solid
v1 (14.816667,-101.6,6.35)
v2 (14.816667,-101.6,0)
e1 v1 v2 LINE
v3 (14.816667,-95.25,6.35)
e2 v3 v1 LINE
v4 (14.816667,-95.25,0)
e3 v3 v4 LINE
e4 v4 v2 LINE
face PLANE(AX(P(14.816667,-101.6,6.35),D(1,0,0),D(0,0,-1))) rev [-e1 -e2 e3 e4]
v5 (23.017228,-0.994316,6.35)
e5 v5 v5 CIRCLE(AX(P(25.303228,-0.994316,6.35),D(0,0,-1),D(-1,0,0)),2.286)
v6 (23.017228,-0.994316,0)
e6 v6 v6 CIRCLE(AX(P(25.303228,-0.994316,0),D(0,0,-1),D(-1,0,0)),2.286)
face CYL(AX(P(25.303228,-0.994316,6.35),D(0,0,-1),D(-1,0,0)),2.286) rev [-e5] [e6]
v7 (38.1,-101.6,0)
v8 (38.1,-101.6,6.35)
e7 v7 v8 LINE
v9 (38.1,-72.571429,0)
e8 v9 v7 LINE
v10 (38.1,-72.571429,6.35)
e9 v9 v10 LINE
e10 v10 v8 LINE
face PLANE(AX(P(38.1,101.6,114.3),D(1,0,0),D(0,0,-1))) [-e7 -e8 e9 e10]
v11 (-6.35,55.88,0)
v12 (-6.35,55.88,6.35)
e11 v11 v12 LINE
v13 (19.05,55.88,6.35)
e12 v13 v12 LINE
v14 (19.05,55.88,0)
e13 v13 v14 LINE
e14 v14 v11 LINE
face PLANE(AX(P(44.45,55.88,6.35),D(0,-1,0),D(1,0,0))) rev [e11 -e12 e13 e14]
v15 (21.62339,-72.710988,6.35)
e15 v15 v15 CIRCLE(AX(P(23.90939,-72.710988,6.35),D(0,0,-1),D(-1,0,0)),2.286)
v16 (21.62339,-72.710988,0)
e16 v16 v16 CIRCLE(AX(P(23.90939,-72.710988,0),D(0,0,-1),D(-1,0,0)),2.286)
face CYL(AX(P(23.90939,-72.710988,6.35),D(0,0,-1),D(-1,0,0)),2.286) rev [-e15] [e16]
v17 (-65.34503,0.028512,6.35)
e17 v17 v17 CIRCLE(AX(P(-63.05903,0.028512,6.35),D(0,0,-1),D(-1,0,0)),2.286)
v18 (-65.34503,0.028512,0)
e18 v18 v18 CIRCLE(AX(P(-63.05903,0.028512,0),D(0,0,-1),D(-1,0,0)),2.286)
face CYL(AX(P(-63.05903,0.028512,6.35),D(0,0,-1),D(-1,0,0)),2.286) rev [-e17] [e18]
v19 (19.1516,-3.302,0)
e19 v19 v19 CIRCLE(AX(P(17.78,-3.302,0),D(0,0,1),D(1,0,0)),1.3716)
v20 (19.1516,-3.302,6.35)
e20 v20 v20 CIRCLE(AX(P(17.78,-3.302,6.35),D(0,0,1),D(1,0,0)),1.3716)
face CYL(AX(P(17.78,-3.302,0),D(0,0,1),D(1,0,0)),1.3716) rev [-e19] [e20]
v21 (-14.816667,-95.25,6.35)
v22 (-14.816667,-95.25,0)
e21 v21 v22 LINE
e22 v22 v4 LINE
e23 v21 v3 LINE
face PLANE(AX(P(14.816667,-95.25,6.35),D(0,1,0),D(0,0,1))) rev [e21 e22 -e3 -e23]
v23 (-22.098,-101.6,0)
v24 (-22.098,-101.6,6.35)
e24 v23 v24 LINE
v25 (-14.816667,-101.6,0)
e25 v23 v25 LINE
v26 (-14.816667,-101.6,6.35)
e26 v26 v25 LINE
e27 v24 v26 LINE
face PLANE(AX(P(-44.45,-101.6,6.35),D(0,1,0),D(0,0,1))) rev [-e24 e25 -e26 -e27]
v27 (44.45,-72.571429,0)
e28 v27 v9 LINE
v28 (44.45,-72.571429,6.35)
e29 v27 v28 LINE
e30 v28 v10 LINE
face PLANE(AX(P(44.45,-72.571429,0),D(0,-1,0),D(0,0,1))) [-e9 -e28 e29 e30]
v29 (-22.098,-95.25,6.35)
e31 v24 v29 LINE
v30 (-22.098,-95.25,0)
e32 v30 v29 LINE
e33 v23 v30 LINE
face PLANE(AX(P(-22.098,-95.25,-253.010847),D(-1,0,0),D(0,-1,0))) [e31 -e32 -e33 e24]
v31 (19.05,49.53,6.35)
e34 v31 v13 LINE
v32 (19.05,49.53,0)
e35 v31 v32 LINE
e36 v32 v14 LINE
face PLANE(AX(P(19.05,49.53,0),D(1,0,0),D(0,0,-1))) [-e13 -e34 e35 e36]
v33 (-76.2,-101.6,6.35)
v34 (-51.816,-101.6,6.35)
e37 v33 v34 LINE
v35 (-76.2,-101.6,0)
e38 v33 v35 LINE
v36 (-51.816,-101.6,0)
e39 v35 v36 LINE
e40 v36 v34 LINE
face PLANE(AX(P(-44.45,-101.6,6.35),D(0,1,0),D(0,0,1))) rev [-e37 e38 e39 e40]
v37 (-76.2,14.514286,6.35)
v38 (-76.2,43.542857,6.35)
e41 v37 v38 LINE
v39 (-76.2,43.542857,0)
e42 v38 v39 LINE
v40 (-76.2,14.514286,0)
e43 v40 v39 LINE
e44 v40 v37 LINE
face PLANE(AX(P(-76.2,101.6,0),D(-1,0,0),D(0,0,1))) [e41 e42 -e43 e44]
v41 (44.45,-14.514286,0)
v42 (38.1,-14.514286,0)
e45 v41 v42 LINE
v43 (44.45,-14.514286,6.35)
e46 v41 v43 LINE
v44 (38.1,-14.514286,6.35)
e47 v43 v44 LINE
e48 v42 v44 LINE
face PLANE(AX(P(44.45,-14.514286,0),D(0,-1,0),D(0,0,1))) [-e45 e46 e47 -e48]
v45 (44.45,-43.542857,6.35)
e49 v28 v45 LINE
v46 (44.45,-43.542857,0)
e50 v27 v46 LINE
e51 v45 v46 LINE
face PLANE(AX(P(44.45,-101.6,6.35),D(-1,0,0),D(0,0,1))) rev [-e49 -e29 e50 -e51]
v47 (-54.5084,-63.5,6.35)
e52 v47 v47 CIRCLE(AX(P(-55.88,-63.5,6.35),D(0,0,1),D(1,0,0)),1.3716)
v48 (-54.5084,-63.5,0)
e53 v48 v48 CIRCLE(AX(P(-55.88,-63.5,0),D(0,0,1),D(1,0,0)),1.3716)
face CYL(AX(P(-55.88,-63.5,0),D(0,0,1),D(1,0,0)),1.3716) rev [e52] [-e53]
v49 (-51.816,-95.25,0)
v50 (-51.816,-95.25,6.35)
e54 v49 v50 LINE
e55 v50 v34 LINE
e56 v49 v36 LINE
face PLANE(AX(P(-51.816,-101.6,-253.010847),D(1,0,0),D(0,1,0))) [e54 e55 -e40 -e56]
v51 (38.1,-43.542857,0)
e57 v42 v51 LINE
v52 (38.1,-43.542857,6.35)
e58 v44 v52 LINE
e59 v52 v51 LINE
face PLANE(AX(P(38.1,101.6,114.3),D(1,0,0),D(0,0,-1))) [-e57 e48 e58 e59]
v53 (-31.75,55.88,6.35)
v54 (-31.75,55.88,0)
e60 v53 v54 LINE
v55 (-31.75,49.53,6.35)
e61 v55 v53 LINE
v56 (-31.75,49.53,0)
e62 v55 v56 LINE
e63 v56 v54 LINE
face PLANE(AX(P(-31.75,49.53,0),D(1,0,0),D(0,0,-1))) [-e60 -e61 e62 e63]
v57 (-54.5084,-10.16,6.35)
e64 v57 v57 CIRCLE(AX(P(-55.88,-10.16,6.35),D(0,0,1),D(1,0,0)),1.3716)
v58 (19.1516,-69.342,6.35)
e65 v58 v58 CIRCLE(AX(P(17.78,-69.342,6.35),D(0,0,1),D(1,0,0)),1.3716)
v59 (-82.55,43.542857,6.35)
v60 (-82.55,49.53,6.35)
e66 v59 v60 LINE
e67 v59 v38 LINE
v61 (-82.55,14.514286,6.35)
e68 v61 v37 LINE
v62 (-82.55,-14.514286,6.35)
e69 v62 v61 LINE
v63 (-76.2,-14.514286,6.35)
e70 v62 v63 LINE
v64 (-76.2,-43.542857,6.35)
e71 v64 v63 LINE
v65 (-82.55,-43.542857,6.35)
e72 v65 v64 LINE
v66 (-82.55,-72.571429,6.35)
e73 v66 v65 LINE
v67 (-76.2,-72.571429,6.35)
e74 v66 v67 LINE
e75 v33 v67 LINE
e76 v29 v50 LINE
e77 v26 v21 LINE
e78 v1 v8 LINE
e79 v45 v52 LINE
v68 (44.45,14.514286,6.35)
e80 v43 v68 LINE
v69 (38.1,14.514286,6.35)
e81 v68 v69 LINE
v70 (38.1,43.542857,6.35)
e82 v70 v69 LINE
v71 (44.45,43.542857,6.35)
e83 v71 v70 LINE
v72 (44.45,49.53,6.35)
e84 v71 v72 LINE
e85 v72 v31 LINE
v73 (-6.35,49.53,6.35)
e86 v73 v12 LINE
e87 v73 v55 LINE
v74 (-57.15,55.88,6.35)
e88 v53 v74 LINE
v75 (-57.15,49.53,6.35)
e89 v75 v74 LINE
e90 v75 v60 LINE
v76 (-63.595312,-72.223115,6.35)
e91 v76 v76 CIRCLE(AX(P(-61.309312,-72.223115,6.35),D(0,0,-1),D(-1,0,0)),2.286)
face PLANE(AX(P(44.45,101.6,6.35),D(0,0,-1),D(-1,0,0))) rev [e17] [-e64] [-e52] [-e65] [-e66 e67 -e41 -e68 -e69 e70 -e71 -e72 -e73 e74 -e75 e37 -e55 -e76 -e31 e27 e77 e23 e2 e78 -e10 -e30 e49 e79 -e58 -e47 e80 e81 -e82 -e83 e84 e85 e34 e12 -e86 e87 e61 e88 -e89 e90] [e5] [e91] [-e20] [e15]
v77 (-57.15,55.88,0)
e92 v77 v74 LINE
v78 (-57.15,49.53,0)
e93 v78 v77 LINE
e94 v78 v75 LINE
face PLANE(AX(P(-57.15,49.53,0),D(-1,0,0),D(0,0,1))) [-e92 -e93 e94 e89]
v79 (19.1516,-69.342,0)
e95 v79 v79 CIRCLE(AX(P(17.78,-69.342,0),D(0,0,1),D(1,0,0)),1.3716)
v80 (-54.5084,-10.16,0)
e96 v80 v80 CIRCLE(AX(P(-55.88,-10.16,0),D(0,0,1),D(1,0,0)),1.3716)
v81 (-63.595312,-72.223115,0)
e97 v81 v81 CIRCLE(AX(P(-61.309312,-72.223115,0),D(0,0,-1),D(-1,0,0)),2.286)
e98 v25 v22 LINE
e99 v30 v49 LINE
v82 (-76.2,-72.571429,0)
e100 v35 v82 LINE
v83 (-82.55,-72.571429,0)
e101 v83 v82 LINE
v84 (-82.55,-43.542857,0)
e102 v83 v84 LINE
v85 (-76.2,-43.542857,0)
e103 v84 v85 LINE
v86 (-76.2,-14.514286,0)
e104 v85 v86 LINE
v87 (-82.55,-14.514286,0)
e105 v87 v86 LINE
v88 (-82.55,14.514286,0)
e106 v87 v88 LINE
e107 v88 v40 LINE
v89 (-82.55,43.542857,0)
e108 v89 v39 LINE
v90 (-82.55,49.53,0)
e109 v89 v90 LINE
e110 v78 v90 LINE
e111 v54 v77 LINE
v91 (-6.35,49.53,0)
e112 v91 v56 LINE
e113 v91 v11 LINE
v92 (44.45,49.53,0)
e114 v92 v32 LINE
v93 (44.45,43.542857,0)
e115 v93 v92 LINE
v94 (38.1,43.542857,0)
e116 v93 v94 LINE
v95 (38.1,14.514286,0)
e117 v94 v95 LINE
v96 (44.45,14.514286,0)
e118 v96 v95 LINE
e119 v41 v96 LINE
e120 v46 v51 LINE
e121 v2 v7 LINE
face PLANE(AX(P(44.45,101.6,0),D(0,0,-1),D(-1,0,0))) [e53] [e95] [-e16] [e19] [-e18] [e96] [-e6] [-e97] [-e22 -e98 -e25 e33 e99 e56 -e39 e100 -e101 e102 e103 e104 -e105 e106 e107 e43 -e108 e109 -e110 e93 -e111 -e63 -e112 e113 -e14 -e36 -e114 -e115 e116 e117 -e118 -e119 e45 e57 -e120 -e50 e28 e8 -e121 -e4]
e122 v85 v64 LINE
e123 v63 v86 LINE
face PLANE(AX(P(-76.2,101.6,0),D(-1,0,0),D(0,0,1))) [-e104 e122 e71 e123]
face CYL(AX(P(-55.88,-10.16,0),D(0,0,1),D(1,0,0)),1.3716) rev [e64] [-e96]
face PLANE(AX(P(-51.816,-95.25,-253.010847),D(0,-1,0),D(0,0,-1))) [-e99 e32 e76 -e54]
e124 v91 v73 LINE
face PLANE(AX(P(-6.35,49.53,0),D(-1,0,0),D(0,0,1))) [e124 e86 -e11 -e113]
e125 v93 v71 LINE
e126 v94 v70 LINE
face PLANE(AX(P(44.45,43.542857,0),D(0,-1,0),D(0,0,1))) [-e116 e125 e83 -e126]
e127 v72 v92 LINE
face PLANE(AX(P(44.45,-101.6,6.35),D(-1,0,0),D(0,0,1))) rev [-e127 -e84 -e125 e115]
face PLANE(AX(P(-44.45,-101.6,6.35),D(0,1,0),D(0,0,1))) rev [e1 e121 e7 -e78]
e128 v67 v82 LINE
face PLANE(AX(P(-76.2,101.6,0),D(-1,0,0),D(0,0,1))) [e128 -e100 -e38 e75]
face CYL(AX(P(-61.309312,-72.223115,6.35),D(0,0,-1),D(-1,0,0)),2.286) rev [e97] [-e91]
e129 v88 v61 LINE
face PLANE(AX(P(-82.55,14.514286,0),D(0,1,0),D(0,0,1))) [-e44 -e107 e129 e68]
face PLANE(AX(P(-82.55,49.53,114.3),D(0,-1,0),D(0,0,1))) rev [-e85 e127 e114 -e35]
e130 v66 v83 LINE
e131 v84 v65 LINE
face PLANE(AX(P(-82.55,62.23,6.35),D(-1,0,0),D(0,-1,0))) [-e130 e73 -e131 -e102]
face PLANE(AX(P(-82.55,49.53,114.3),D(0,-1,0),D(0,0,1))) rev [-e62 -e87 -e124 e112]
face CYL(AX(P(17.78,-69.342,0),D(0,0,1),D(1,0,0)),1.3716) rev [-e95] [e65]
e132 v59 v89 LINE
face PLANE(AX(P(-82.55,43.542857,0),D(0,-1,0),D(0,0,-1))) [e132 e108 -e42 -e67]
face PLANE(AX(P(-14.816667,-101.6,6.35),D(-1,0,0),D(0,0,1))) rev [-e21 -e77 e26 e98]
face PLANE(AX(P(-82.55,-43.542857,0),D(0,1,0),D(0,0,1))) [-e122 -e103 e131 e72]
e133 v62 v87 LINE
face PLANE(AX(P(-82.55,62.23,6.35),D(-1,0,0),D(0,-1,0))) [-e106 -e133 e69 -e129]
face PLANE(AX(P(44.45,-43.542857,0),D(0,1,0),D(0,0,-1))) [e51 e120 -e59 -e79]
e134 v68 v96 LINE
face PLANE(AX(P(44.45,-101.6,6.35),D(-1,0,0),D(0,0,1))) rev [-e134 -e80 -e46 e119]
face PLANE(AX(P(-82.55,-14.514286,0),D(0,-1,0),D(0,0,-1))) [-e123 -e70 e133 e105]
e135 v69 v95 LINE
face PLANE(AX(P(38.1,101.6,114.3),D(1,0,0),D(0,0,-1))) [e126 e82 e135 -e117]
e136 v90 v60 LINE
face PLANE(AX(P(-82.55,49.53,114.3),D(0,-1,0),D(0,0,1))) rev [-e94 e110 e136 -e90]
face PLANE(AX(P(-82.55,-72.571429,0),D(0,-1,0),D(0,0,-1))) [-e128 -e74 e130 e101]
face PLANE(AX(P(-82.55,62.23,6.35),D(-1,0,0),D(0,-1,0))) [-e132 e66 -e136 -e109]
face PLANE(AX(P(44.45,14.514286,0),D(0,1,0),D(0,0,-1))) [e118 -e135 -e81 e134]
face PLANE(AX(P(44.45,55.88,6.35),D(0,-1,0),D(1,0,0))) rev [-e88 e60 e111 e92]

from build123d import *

# Parameters (mm, degrees)
SKETCH1_W               = 88.9
SKETCH1_H               = 203.2
BOSS_EXTRUDE1_DEPTH     = 6.35
SKETCH3_W               = 29.633333334
SKETCH3_H               = 6.35
CUT_EXTRUDE2_DEPTH      = 112.079633597
CAVITY2_START           = -101.6
CAVITY2_OUTLINE_W       = 6.35
CAVITY2_OUTLINE_H       = 6.35
CAVITY2_DEPTH           = 29.028571429
CAVITY2_START_2         = -43.542857143
CAVITY2_2_OUTLINE_W     = 6.35
CAVITY2_2_OUTLINE_H     = 6.35
CAVITY2_2_DEPTH         = 29.028571429
CAVITY2_START_3         = 14.514285714
CAVITY2_3_OUTLINE_W     = 6.35
CAVITY2_3_OUTLINE_H     = 6.35
CAVITY2_3_DEPTH         = 29.028571429
CUT_EXTRUDE3_DEPTH      = 112.079633597
SKETCH5_W               = 38.1
SKETCH5_H               = 163.83
BOSS_EXTRUDE2_DEPTH     = 6.35
CAVITY3_START           = 49.53
CAVITY3_OUTLINE_W       = 25.4
CAVITY3_OUTLINE_H       = 6.35
CAVITY3_DEPTH           = 6.35
CAVITY3_START_2         = -101.6
CAVITY3_2_OUTLINE_W     = 6.35
CAVITY3_2_OUTLINE_H     = 6.35
CAVITY3_2_DEPTH         = 29.028571429
CAVITY3_START_3         = -43.542857143
CAVITY3_3_OUTLINE_W     = 6.35
CAVITY3_3_OUTLINE_H     = 6.35
CAVITY3_3_DEPTH         = 29.028571429
CAVITY3_START_4         = 14.514285714
CAVITY3_4_OUTLINE_W     = 6.35
CAVITY3_4_OUTLINE_H     = 6.35
CAVITY3_4_DEPTH         = 29.028571429
SKETCH7_W               = 127
SKETCH7_H               = 6.35
CUT_EXTRUDE4_DEPTH      = 132.062523247
CUT_EXTRUDE5_DEPTH      = 132.062523247
CUT_EXTRUDE5_DEPTH_BACK = 132.062523247
SKETCH9_R               = 1.3716
CUT_EXTRUDE6_DEPTH      = 132.062523247
SKETCH10_R              = 2.286
CUT_EXTRUDE8_DEPTH      = 132.062523247


# Read off the part's stored shape, not the designer's step: Cavity2, Cavity3
with BuildPart() as part:
    # Sketch1 → Boss-Extrude1 (new body)
    with BuildSketch(Plane.XY):
        Rectangle(SKETCH1_W, SKETCH1_H)
    extrude(amount=BOSS_EXTRUDE1_DEPTH)

    # Sketch3 → Cut-Extrude2 (cut, through all)
    with BuildSketch(Plane(origin=(0, 0, 0), x_dir=(-1, 0, 0), z_dir=(0, 0, -1))):
        with Locations((0, -98.425)):
            Rectangle(SKETCH3_W, SKETCH3_H)
    extrude(amount=-CUT_EXTRUDE2_DEPTH, mode=Mode.SUBTRACT)

    # Cavity2 outline → Cavity2 (cut)
    with BuildSketch(Plane(origin=(0, 0, 0), x_dir=(1, 0, 0), z_dir=(0, 1, 0)).offset(CAVITY2_START)):
        with Locations((41.275, -3.175)):
            Rectangle(CAVITY2_OUTLINE_W, CAVITY2_OUTLINE_H)
    extrude(amount=CAVITY2_DEPTH, mode=Mode.SUBTRACT)

    # Cavity2 2 outline → Cavity2 2 (cut)
    with BuildSketch(Plane(origin=(0, 0, 0), x_dir=(1, 0, 0), z_dir=(0, 1, 0)).offset(CAVITY2_START_2)):
        with Locations((41.275, -3.175)):
            Rectangle(CAVITY2_2_OUTLINE_W, CAVITY2_2_OUTLINE_H)
    extrude(amount=CAVITY2_2_DEPTH, mode=Mode.SUBTRACT)

    # Cavity2 3 outline → Cavity2 3 (cut)
    with BuildSketch(Plane(origin=(0, 0, 0), x_dir=(1, 0, 0), z_dir=(0, 1, 0)).offset(CAVITY2_START_3)):
        with Locations((41.275, -3.175)):
            Rectangle(CAVITY2_3_OUTLINE_W, CAVITY2_3_OUTLINE_H)
    extrude(amount=CAVITY2_3_DEPTH, mode=Mode.SUBTRACT)

    # Sketch4 → Cut-Extrude3 (cut, through all)
    with BuildSketch(Plane(origin=(0, 0, 0), x_dir=(-1, 0, 0), z_dir=(0, 0, -1))):
        Polygon((0, 62.23), (44.45, 62.23), (44.45, 101.6), (-44.45, 101.6), (-44.45, 62.23), align=None)
    extrude(amount=-CUT_EXTRUDE3_DEPTH, mode=Mode.SUBTRACT)

    # Sketch5 → Boss-Extrude2 (add, through all)
    with BuildSketch(Plane(origin=(0, 0, 0), x_dir=(-1, 0, 0), z_dir=(0, 0, -1))):
        with Locations((63.5, -19.685)):
            Rectangle(SKETCH5_W, SKETCH5_H)
    extrude(amount=-BOSS_EXTRUDE2_DEPTH)

    # Cavity3 outline → Cavity3 (cut)
    with BuildSketch(Plane(origin=(0, 0, 0), x_dir=(1, 0, 0), z_dir=(0, 1, 0)).offset(CAVITY3_START)):
        with Locations((-69.85, -3.175)):
            Rectangle(CAVITY3_OUTLINE_W, CAVITY3_OUTLINE_H)
        with Locations((-19.05, -3.175)):
            Rectangle(CAVITY3_OUTLINE_W, CAVITY3_OUTLINE_H)
        with Locations((31.75, -3.175)):
            Rectangle(CAVITY3_OUTLINE_W, CAVITY3_OUTLINE_H)
    extrude(amount=CAVITY3_DEPTH, mode=Mode.SUBTRACT)

    # Cavity3 2 outline → Cavity3 2 (cut)
    with BuildSketch(Plane(origin=(0, 0, 0), x_dir=(1, 0, 0), z_dir=(0, 1, 0)).offset(CAVITY3_START_2)):
        with Locations((-79.375, -3.175)):
            Rectangle(CAVITY3_2_OUTLINE_W, CAVITY3_2_OUTLINE_H)
    extrude(amount=CAVITY3_2_DEPTH, mode=Mode.SUBTRACT)

    # Cavity3 3 outline → Cavity3 3 (cut)
    with BuildSketch(Plane(origin=(0, 0, 0), x_dir=(1, 0, 0), z_dir=(0, 1, 0)).offset(CAVITY3_START_3)):
        with Locations((-79.375, -3.175)):
            Rectangle(CAVITY3_3_OUTLINE_W, CAVITY3_3_OUTLINE_H)
    extrude(amount=CAVITY3_3_DEPTH, mode=Mode.SUBTRACT)

    # Cavity3 4 outline → Cavity3 4 (cut)
    with BuildSketch(Plane(origin=(0, 0, 0), x_dir=(1, 0, 0), z_dir=(0, 1, 0)).offset(CAVITY3_START_4)):
        with Locations((-79.375, -3.175)):
            Rectangle(CAVITY3_4_OUTLINE_W, CAVITY3_4_OUTLINE_H)
    extrude(amount=CAVITY3_4_DEPTH, mode=Mode.SUBTRACT)

    # Sketch7 → Cut-Extrude4 (cut, through all)
    with BuildSketch(Plane(origin=(0, 0, 0), x_dir=(-1, 0, 0), z_dir=(0, 0, -1))):
        with Locations((19.05, 59.055)):
            Rectangle(SKETCH7_W, SKETCH7_H)
    extrude(amount=-CUT_EXTRUDE4_DEPTH, mode=Mode.SUBTRACT)

    # Sketch8 → Cut-Extrude5 (cut, two sides: drawn at the far end of the back side and taken through both)
    with BuildSketch(Plane(origin=(0, 0, 0), x_dir=(-1, 0, 0), z_dir=(0, 0, -1)).offset(-CUT_EXTRUDE5_DEPTH_BACK)):
        Polygon((51.816, -480.745462689), (51.816, -101.6), (51.816, -95.25), (22.098, -95.25), (22.098, -101.6), (22.098, -480.745462689), (22.098, -1239.036388068), (51.816, -1239.036388068), align=None)
    extrude(amount=CUT_EXTRUDE5_DEPTH + CUT_EXTRUDE5_DEPTH_BACK, mode=Mode.SUBTRACT)

    # Sketch9 → Cut-Extrude6 (cut, through all)
    with BuildSketch(Plane.XY.offset(6.35)):
        with Locations((-55.88, -63.5)):
            Circle(SKETCH9_R)
        with Locations((17.78, -69.342)):
            Circle(SKETCH9_R)
        with Locations((-55.88, -10.16)):
            Circle(SKETCH9_R)
        with Locations((17.78, -3.302)):
            Circle(SKETCH9_R)
    extrude(amount=-CUT_EXTRUDE6_DEPTH, mode=Mode.SUBTRACT)

    # Sketch10 → Cut-Extrude8 (cut, through all)
    with BuildSketch(Plane(origin=(0, 0, 0), x_dir=(-1, 0, 0), z_dir=(0, 0, -1))):
        with Locations((61.309312367, -72.22311472)):
            Circle(SKETCH10_R)
        with Locations((63.059030347, 0.028511897)):
            Circle(SKETCH10_R)
        with Locations((-23.90939041, -72.710988475)):
            Circle(SKETCH10_R)
        with Locations((-25.303227794, -0.994316453)):
            Circle(SKETCH10_R)
    extrude(amount=-CUT_EXTRUDE8_DEPTH, mode=Mode.SUBTRACT)


solid = part.part
